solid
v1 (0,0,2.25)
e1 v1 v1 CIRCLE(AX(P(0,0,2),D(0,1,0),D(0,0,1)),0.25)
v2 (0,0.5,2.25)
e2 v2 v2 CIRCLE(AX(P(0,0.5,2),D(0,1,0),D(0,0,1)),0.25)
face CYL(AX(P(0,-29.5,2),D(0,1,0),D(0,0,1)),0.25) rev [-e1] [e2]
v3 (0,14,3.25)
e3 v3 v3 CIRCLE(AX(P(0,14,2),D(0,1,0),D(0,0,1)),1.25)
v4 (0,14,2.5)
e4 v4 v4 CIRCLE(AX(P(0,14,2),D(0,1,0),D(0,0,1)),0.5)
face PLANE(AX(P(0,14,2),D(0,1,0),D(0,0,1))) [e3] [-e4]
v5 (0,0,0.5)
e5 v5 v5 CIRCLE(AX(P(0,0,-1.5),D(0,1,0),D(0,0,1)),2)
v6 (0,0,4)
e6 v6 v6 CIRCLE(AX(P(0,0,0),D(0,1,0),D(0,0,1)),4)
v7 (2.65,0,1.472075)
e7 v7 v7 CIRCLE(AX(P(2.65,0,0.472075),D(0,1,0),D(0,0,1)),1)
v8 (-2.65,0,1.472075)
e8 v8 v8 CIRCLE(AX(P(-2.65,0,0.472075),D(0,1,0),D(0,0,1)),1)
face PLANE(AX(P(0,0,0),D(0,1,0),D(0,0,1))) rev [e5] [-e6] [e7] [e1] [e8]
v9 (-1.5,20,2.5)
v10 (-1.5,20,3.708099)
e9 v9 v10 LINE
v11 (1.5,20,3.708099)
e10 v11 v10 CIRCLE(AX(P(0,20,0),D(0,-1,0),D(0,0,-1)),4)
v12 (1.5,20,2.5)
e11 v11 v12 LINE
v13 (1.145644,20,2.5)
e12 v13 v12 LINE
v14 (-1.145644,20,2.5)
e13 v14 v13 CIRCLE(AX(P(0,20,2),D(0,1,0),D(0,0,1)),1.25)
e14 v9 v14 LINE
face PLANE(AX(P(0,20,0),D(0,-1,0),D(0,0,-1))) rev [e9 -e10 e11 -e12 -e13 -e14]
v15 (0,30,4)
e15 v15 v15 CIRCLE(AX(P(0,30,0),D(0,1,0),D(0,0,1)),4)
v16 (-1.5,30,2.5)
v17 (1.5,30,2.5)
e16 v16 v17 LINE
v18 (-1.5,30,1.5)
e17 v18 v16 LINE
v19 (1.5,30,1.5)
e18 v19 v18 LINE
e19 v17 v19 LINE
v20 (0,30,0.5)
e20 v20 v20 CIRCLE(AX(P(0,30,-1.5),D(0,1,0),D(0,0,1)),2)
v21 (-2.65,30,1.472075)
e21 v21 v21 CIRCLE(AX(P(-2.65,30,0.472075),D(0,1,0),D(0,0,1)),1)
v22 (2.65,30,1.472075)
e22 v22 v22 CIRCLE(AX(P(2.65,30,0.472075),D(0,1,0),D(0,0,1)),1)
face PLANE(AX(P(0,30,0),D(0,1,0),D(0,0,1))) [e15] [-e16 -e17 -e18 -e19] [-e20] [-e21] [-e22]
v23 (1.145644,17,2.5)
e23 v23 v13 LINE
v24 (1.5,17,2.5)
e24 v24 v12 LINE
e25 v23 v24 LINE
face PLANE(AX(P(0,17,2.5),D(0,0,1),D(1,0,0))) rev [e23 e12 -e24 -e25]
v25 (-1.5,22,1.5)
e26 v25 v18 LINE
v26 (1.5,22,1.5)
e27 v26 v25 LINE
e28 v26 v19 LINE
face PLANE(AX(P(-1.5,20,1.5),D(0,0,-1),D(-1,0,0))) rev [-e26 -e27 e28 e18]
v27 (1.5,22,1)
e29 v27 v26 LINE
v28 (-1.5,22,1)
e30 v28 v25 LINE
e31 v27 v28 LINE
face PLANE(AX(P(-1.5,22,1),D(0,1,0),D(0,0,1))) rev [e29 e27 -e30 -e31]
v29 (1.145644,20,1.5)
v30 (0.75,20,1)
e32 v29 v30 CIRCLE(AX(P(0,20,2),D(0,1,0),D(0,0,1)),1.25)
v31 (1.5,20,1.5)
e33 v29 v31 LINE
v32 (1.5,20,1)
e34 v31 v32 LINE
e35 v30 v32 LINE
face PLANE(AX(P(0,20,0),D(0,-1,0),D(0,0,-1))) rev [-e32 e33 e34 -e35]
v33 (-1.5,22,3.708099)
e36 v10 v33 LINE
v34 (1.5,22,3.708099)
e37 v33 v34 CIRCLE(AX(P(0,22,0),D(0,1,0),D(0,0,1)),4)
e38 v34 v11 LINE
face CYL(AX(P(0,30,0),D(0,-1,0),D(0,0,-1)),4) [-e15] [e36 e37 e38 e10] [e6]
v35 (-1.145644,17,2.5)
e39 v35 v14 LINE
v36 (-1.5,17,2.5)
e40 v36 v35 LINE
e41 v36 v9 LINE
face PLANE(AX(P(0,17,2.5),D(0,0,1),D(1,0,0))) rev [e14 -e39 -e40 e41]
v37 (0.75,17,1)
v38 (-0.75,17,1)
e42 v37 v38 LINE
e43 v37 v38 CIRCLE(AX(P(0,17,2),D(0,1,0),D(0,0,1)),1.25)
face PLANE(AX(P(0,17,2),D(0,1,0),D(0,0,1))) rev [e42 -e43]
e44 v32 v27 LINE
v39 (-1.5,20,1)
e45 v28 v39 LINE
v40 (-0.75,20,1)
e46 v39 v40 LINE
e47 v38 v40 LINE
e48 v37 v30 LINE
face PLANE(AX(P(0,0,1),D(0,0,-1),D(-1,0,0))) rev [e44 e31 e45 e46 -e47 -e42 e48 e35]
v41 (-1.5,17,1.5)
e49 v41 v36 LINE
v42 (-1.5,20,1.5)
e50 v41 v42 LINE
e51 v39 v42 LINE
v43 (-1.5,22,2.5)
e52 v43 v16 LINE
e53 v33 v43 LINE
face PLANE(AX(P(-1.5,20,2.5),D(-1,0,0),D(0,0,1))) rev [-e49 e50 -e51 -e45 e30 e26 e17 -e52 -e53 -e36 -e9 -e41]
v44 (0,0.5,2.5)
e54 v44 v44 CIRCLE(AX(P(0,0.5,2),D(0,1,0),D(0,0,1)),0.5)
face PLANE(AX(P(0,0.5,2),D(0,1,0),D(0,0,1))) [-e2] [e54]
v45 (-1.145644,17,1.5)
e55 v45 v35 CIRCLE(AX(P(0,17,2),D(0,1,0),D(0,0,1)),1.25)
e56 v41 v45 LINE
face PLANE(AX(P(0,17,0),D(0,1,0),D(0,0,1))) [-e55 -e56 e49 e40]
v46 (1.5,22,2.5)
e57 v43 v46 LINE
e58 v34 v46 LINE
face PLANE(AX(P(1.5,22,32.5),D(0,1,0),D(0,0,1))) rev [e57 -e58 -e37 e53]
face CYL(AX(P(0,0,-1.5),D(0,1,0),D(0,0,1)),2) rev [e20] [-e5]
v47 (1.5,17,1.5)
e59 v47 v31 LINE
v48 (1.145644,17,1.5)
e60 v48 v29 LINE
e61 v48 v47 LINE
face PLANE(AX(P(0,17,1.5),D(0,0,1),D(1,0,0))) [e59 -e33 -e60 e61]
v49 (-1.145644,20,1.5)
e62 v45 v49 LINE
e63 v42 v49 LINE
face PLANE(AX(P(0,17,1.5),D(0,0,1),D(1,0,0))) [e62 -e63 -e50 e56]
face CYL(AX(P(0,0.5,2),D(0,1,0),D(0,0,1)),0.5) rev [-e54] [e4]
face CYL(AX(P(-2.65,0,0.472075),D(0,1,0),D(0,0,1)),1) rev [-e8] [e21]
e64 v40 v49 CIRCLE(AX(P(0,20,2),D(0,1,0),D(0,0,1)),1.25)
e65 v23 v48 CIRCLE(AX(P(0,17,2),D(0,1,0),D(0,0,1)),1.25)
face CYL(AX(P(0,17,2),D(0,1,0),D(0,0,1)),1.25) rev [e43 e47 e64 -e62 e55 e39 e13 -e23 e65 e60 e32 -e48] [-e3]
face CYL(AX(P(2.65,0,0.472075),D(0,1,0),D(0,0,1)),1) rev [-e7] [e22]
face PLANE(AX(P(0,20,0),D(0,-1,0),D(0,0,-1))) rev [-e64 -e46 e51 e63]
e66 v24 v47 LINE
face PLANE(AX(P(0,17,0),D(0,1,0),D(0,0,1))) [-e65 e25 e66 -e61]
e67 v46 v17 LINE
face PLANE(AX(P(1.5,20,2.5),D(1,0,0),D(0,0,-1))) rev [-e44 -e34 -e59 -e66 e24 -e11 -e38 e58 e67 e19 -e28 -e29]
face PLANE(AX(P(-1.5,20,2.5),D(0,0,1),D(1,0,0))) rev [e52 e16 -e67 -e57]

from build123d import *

# Parameters (mm, degrees)
SKETCH1_R           = 4
BOSS_EXTRUDE1_DEPTH = 30
SKETCH2_W           = 3
SKETCH2_H           = 1
CUT_EXTRUDE1_DEPTH  = 10
SKETCH3_R           = 2
CUT_EXTRUDE2_DEPTH  = 30
SKETCH4_W           = 3
SKETCH4_H           = 2
CUT_EXTRUDE3_DEPTH  = 30
SKETCH5_W           = 3
SKETCH5_H           = 2
CUT_EXTRUDE5_DEPTH  = 0.5
CUT_EXTRUDE7_START  = -3
CUT_EXTRUDE7_DEPTH  = 3
CUT_EXTRUDE8_START  = -3
SKETCH8_R           = 1.25
CUT_EXTRUDE8_DEPTH  = 3
SKETCH9_R           = 0.5
CUT_EXTRUDE9_DEPTH  = 13.5
SKETCH10_R          = 0.25
CUT_EXTRUDE10_DEPTH = 30
SKETCH11_R          = 1
CUT_EXTRUDE11_DEPTH = 30


# Read off the part's stored shape, not the designer's step: Cut-Extrude7
with BuildPart() as part:
    # Sketch1 → Boss-Extrude1 (new body)
    with BuildSketch(Plane(origin=(0, 0, 0), x_dir=(1, 0, 0), z_dir=(0, 1, 0))):
        with Locations(Location((0, 0, 0), (0, 0, 270))):
            Circle(SKETCH1_R)
    extrude(amount=BOSS_EXTRUDE1_DEPTH)

    # Sketch2 → Cut-Extrude1 (cut)
    with BuildSketch(Plane(origin=(0, 30, 0), x_dir=(1, 0, 0), z_dir=(0, 1, 0))):
        with Locations((0, -2)):
            Rectangle(SKETCH2_W, SKETCH2_H)
    extrude(amount=-CUT_EXTRUDE1_DEPTH, mode=Mode.SUBTRACT)

    # Sketch3 → Cut-Extrude2 (cut)
    with BuildSketch(Plane(origin=(0, 30, 0), x_dir=(1, 0, 0), z_dir=(0, 1, 0))):
        with Locations(Location((0, 1.5, 0), (0, 0, 270))):
            Circle(SKETCH3_R)
    extrude(amount=-CUT_EXTRUDE2_DEPTH, mode=Mode.SUBTRACT)

    # Sketch4 → Cut-Extrude3 (cut)
    with BuildSketch(Plane(origin=(0, 0, 2.5), x_dir=(-1, 0, 0), z_dir=(0, 0, -1))):
        with Locations((0, 21)):
            Rectangle(SKETCH4_W, SKETCH4_H)
    extrude(amount=-CUT_EXTRUDE3_DEPTH, mode=Mode.SUBTRACT)

    # Sketch5 → Cut-Extrude5 (cut)
    with BuildSketch(Plane.XY.offset(1.5)):
        with Locations((0, 21)):
            Rectangle(SKETCH5_W, SKETCH5_H)
    extrude(amount=-CUT_EXTRUDE5_DEPTH, mode=Mode.SUBTRACT)

    # Cut-Extrude7 outline → Cut-Extrude7 (cut)
    with BuildSketch(Plane(origin=(0, 20, 0), x_dir=(1, 0, 0), z_dir=(0, 1, 0)).offset(CUT_EXTRUDE7_START)):
        with BuildLine():
            Line((1.145643924, -2.5), (1.5, -2.5))
            Line((1.5, -2.5), (1.5, -1.5))
            Line((1.5, -1.5), (1.145643924, -1.5))
            ThreePointArc((1.145643924, -1.5), (0.980237967, -1.224349609), (0.75, -1))
            Line((0.75, -1), (-0.75, -1))
            ThreePointArc((-0.75, -1), (-0.980237967, -1.224349609), (-1.145643924, -1.5))
            Line((-1.145643924, -1.5), (-1.5, -1.5))
            Line((-1.5, -1.5), (-1.5, -2.5))
            Line((-1.5, -2.5), (-1.145643924, -2.5))
            ThreePointArc((-1.145643924, -2.5), (0, -3.25), (1.145643924, -2.5))
        make_face()
    extrude(amount=CUT_EXTRUDE7_DEPTH, mode=Mode.SUBTRACT)

    # Sketch8 → Cut-Extrude8 (cut)
    with BuildSketch(Plane(origin=(0, 17, 0), x_dir=(1, 0, 0), z_dir=(0, 1, 0)).offset(CUT_EXTRUDE8_START)):
        with Locations(Location((0, -2, 0), (0, 0, 270))):
            Circle(SKETCH8_R)
    extrude(amount=CUT_EXTRUDE8_DEPTH, mode=Mode.SUBTRACT)

    # Sketch9 → Cut-Extrude9 (cut)
    with BuildSketch(Plane(origin=(0, 14, 0), x_dir=(1, 0, 0), z_dir=(0, 1, 0))):
        with Locations(Location((0, -2, 0), (0, 0, 270))):
            Circle(SKETCH9_R)
    extrude(amount=-CUT_EXTRUDE9_DEPTH, mode=Mode.SUBTRACT)

    # Sketch10 → Cut-Extrude10 (cut)
    with BuildSketch(Plane(origin=(0, 0.5, 0), x_dir=(1, 0, 0), z_dir=(0, 1, 0))):
        with Locations(Location((0, -2, 0), (0, 0, 270))):
            Circle(SKETCH10_R)
    extrude(amount=-CUT_EXTRUDE10_DEPTH, mode=Mode.SUBTRACT)

    # Sketch11 → Cut-Extrude11 (cut)
    with BuildSketch(Plane(origin=(0, 30, 0), x_dir=(1, 0, 0), z_dir=(0, 1, 0))):
        with Locations(Location((-2.65, -0.472074699, 0), (0, 0, 270))):
            Circle(SKETCH11_R)
        with Locations(Location((2.65, -0.472074699, 0), (0, 0, 270))):
            Circle(SKETCH11_R)
    extrude(amount=-CUT_EXTRUDE11_DEPTH, mode=Mode.SUBTRACT)


solid = part.part
